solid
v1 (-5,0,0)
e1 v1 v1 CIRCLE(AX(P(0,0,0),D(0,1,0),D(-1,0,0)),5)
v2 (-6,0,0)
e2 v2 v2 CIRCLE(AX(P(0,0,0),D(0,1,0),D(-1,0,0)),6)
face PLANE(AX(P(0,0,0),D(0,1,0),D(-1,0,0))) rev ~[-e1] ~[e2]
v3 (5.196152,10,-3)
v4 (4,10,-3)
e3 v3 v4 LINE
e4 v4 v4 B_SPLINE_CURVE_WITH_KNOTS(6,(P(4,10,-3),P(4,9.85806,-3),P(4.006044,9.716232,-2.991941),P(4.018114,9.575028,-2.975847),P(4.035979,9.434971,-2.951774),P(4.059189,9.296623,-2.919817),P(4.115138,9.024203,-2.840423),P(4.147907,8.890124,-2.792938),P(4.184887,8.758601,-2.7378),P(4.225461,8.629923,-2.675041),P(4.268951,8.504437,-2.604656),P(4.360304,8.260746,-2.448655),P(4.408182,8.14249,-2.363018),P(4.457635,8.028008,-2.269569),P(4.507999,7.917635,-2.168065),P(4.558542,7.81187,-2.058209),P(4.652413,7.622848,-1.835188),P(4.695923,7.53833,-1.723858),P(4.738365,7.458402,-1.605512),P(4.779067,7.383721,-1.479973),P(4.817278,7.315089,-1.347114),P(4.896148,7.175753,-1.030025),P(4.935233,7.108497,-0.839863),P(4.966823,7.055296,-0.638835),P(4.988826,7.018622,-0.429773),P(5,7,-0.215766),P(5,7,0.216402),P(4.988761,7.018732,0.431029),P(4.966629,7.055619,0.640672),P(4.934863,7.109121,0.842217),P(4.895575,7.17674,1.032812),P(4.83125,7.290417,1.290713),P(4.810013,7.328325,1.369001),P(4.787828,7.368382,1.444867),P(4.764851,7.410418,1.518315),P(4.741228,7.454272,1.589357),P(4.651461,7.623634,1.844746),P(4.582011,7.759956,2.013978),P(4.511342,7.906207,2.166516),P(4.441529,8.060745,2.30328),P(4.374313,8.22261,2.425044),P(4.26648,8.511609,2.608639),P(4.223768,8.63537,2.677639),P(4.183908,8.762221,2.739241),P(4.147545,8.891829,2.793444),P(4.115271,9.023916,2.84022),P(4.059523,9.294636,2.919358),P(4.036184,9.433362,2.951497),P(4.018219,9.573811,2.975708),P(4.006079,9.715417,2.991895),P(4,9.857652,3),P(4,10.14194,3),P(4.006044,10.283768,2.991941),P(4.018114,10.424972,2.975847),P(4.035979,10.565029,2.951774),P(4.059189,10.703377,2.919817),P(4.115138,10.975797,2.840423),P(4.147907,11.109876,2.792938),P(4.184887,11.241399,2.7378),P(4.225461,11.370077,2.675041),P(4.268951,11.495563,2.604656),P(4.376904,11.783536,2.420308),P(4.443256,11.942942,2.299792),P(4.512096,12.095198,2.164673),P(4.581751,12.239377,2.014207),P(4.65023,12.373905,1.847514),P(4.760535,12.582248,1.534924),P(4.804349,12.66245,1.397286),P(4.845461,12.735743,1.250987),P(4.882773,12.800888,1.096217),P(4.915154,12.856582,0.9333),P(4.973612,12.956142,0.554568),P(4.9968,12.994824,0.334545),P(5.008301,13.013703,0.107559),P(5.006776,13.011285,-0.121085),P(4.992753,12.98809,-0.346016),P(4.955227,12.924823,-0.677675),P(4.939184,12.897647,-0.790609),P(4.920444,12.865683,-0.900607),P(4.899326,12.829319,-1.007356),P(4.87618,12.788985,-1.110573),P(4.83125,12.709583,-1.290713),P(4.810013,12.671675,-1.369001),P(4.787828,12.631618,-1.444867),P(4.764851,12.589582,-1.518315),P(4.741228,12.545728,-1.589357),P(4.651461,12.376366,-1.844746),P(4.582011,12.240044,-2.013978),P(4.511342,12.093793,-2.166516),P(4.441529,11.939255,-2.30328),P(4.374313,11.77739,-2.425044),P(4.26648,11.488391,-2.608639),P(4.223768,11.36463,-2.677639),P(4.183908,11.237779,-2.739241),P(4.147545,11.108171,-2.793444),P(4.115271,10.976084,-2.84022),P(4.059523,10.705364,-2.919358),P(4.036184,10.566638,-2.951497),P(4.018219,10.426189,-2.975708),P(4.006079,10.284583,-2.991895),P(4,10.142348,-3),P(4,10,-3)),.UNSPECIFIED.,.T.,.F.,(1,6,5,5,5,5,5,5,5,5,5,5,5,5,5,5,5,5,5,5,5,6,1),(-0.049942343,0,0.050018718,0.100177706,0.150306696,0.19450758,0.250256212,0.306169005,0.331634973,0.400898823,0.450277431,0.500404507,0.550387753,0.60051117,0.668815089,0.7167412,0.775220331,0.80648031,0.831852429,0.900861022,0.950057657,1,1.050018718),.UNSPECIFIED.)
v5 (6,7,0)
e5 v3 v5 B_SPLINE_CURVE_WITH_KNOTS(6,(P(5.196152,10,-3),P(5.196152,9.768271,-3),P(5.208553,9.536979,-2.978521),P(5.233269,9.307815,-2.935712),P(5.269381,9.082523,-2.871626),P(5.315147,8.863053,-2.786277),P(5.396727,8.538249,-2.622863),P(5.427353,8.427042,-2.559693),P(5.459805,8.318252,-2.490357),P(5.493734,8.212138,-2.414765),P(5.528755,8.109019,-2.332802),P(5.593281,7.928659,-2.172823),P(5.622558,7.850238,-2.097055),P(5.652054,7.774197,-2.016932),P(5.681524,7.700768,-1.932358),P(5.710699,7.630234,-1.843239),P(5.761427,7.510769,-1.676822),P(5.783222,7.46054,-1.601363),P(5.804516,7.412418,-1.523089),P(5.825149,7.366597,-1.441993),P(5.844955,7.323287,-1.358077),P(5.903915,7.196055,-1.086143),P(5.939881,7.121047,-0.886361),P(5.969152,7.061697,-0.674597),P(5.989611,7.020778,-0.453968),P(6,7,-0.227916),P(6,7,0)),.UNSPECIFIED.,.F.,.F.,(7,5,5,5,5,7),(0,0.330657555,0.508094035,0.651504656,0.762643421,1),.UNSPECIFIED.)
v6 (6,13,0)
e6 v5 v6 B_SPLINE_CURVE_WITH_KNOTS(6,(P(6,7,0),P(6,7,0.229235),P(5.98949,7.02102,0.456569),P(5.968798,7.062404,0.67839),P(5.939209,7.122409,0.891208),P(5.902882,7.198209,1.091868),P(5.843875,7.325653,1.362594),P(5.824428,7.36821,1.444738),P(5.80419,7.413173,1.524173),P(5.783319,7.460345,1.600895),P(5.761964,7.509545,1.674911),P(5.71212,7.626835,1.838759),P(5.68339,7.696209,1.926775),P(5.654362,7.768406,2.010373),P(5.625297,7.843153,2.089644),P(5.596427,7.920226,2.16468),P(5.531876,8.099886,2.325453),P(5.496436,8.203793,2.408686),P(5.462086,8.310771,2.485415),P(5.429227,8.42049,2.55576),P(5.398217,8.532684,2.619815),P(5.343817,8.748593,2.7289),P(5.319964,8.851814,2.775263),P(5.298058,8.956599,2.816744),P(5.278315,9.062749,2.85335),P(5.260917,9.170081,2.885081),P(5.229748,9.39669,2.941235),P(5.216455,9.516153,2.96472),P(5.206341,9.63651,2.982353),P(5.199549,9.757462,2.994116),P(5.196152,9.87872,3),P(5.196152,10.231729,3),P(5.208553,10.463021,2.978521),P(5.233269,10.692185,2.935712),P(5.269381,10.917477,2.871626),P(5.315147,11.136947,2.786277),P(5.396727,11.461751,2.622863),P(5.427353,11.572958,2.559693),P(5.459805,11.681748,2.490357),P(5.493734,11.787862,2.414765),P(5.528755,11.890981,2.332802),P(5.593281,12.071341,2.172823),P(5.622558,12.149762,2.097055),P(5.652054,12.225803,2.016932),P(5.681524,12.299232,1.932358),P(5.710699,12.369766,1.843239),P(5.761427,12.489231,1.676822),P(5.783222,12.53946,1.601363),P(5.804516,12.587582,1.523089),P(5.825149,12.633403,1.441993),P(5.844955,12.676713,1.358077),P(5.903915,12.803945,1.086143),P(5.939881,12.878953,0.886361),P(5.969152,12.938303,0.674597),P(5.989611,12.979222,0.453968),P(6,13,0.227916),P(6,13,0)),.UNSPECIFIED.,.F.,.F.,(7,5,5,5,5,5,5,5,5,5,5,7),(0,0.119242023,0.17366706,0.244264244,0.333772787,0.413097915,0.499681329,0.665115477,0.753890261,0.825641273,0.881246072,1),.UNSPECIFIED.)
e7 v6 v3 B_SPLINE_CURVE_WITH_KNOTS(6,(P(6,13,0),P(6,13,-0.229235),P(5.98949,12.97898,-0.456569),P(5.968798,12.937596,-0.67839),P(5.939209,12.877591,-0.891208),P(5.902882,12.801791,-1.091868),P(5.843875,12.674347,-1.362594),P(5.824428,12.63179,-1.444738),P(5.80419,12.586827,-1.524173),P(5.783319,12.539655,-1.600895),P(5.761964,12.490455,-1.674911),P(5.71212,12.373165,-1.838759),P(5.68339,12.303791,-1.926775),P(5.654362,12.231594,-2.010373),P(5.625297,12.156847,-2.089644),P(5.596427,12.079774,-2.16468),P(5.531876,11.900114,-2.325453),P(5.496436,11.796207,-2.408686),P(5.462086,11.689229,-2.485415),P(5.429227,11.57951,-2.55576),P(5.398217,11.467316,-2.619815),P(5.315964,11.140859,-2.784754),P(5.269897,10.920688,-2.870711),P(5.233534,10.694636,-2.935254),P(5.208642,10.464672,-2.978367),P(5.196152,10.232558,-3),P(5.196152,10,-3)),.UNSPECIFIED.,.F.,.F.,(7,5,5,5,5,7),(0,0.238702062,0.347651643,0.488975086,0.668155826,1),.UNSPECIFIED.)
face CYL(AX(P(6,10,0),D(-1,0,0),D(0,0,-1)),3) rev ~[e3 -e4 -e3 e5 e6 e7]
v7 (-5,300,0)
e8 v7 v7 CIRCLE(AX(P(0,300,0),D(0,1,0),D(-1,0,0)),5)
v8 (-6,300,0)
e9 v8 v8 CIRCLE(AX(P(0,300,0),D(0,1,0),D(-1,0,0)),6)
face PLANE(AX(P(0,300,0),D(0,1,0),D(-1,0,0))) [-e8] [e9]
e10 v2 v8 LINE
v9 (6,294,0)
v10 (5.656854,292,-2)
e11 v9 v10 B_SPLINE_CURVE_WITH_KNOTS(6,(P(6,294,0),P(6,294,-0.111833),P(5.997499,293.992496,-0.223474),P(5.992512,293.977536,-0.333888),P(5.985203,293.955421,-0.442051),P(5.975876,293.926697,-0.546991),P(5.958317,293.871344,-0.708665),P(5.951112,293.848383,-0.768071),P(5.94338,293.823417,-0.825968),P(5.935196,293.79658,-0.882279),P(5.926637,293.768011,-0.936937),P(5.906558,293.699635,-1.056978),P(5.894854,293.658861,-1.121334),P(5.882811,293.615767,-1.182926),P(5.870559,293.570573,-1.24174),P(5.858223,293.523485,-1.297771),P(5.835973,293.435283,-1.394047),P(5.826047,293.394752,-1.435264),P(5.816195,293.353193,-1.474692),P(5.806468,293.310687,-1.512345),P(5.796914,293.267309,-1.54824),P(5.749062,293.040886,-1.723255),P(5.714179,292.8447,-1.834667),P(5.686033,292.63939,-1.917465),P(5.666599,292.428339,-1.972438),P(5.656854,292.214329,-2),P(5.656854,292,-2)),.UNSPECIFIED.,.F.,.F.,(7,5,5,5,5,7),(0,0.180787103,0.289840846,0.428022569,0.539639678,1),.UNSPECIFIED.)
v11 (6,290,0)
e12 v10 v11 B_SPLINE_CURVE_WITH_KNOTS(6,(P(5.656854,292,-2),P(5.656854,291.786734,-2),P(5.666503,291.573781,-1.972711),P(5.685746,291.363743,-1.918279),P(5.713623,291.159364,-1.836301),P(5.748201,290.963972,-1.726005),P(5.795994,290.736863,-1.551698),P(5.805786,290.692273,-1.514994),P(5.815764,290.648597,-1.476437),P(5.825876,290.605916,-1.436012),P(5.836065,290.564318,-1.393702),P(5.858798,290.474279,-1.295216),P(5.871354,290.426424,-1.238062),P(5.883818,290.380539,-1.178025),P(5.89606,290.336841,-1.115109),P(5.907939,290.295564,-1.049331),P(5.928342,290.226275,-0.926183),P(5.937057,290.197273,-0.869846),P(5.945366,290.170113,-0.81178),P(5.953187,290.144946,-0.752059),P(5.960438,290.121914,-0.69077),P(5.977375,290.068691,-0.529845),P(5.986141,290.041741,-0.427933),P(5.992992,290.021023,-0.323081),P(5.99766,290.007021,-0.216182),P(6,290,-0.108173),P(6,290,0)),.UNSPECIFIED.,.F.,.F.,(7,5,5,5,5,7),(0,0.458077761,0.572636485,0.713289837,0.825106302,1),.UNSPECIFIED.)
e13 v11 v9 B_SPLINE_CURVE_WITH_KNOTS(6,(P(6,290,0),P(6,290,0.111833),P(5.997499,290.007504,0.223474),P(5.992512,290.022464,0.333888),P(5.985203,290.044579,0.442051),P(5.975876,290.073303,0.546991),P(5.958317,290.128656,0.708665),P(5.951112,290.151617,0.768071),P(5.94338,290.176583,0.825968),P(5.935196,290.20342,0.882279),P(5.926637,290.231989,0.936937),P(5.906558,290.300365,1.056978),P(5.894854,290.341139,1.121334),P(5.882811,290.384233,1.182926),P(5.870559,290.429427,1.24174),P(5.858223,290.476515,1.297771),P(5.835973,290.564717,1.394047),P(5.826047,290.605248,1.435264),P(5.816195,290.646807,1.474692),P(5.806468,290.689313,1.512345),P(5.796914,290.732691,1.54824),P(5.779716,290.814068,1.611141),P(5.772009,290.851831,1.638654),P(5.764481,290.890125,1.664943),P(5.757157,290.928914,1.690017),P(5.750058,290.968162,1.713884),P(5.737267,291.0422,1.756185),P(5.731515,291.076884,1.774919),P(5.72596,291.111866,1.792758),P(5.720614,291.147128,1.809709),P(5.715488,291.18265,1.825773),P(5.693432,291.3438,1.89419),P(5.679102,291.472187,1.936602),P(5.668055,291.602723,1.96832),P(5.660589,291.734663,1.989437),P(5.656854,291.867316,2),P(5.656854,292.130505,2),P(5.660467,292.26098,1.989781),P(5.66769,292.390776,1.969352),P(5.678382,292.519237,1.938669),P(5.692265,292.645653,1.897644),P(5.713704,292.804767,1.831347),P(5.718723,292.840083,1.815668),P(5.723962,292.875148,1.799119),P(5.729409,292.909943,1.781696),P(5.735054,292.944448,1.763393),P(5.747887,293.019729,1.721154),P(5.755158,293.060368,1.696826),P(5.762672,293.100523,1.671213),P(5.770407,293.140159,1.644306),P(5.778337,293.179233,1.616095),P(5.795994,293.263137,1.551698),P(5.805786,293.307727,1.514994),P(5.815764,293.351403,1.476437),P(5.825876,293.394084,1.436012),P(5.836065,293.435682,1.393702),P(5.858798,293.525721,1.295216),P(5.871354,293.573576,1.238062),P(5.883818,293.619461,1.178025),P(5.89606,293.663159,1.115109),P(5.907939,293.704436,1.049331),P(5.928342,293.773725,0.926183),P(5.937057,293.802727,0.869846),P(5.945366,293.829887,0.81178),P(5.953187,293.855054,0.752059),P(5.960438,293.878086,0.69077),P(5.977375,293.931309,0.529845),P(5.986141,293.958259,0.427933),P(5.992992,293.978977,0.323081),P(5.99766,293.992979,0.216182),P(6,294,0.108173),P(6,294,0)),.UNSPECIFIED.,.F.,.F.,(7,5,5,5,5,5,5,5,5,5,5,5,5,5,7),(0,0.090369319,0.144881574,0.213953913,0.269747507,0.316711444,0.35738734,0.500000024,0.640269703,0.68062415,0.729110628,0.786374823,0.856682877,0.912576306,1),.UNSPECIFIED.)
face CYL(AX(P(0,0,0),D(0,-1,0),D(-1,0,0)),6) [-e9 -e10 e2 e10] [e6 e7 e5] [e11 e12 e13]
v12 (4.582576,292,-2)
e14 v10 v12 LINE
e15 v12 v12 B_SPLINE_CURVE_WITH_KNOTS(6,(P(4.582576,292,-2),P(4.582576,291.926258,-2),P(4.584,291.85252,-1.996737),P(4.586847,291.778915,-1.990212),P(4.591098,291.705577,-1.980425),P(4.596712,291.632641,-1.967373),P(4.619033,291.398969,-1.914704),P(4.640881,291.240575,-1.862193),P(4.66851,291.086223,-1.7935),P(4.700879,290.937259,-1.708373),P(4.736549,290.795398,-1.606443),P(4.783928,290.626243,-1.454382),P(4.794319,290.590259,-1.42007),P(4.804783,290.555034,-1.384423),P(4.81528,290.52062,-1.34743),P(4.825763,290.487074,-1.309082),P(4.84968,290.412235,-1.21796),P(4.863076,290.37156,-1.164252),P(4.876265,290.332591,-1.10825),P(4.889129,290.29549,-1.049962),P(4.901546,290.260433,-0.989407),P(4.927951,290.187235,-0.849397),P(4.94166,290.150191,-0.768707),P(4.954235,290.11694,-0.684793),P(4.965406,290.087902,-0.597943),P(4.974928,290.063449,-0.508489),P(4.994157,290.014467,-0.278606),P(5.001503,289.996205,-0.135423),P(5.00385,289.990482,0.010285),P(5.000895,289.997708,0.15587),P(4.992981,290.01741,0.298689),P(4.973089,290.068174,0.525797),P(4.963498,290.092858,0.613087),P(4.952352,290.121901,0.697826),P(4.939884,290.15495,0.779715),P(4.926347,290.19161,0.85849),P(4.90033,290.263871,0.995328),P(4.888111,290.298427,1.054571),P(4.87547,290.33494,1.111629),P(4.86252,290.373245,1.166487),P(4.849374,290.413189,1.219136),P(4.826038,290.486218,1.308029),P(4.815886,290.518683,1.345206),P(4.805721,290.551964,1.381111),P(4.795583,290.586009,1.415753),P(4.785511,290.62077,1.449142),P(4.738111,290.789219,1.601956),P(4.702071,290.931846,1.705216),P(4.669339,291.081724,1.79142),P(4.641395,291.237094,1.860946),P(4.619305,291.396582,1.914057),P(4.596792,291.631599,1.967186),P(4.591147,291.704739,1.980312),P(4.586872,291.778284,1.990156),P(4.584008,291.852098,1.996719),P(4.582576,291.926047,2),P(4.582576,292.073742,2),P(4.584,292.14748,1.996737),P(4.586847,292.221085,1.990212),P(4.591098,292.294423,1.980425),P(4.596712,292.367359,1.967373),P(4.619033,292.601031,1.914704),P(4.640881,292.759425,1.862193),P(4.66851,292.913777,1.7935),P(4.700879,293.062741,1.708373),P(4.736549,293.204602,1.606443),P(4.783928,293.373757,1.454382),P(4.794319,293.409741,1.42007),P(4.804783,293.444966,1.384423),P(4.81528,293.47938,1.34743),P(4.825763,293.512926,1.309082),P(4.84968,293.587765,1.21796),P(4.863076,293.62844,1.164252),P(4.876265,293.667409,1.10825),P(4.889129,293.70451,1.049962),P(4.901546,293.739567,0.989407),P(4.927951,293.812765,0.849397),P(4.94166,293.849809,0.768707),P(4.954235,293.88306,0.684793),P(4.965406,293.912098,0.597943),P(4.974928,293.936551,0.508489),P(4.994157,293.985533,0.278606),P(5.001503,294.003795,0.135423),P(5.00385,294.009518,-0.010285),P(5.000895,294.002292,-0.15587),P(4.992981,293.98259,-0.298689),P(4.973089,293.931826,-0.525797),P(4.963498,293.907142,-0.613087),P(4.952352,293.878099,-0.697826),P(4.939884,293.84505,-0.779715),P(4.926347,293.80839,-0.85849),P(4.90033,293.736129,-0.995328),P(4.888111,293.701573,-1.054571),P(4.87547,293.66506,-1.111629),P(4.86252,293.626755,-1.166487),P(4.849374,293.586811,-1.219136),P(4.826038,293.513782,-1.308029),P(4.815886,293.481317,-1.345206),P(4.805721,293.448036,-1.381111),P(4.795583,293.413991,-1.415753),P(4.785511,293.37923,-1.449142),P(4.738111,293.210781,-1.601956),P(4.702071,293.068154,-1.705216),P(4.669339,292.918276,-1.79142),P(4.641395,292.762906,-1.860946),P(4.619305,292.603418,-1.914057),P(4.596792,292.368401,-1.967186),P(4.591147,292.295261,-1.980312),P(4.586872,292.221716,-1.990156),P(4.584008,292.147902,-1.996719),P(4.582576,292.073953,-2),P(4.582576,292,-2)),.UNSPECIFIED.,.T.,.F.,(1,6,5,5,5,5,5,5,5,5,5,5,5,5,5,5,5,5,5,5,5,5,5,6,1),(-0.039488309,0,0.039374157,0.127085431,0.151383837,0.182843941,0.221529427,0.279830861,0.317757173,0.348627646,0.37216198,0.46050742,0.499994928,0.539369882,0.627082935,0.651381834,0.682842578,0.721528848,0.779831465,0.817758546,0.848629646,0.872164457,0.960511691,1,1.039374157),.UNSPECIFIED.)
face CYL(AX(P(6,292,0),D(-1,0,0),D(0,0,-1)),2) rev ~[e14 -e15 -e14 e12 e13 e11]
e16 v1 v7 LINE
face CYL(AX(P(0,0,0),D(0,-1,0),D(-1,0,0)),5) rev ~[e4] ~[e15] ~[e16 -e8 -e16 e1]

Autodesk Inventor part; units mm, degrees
ref_plane "XZ Plane" through (0, 0, 0) normal (0, 1, 0) x (-1, 0, 0)
ref_plane "XY Plane" through (0, 0, 0) normal (0, 0, 1) x (1, 0, 0)
sketch "Sketch1" plane through (0, 0, 0) normal (0, 1, 0) x (-1, 0, 0)
  circle A0 centre (0, 0) radius 5
  circle A1 centre (0, 0) radius 6
  dimension "d0" = 12
  dimension "d1" = 1
extrude "Extrusion1" add sketch "Sketch1" along normal blind 300
ref_plane "Work Plane3" through (6, 0, 0) normal (1, 0, 0) x (0, 1, 0)
sketch "Sketch2" plane through (6, 0, 0) normal (1, 0, 0) x (0, 1, 0)
  line L0 (0, -6) -> (300, -6) projected
  line L1 (0, 6) -> (300, 6) projected
  line L2 (300, -6) -> (300, 6) projected
  line L3 (-60, 0) -> (360, 0) projected
  point P0 (0, 0)
  point P1 (10, 0)
  point P2 (292, 0)
  point P3 (300, 0)
  dimension "d20" = 10
  dimension "d21" = 8
hole "Hole1" at (6, 10, 0) direction (-1, 0, 0) diameter 6 end up to surface
hole "Hole2" at (6, 292, 0) direction (-1, 0, 0) diameter 4 end up to surface
equation "\"d2\" = pipe_length"
equation "\"pipe_length\" = 300"
properties part number "pipe" material "Aluminum 6061"
